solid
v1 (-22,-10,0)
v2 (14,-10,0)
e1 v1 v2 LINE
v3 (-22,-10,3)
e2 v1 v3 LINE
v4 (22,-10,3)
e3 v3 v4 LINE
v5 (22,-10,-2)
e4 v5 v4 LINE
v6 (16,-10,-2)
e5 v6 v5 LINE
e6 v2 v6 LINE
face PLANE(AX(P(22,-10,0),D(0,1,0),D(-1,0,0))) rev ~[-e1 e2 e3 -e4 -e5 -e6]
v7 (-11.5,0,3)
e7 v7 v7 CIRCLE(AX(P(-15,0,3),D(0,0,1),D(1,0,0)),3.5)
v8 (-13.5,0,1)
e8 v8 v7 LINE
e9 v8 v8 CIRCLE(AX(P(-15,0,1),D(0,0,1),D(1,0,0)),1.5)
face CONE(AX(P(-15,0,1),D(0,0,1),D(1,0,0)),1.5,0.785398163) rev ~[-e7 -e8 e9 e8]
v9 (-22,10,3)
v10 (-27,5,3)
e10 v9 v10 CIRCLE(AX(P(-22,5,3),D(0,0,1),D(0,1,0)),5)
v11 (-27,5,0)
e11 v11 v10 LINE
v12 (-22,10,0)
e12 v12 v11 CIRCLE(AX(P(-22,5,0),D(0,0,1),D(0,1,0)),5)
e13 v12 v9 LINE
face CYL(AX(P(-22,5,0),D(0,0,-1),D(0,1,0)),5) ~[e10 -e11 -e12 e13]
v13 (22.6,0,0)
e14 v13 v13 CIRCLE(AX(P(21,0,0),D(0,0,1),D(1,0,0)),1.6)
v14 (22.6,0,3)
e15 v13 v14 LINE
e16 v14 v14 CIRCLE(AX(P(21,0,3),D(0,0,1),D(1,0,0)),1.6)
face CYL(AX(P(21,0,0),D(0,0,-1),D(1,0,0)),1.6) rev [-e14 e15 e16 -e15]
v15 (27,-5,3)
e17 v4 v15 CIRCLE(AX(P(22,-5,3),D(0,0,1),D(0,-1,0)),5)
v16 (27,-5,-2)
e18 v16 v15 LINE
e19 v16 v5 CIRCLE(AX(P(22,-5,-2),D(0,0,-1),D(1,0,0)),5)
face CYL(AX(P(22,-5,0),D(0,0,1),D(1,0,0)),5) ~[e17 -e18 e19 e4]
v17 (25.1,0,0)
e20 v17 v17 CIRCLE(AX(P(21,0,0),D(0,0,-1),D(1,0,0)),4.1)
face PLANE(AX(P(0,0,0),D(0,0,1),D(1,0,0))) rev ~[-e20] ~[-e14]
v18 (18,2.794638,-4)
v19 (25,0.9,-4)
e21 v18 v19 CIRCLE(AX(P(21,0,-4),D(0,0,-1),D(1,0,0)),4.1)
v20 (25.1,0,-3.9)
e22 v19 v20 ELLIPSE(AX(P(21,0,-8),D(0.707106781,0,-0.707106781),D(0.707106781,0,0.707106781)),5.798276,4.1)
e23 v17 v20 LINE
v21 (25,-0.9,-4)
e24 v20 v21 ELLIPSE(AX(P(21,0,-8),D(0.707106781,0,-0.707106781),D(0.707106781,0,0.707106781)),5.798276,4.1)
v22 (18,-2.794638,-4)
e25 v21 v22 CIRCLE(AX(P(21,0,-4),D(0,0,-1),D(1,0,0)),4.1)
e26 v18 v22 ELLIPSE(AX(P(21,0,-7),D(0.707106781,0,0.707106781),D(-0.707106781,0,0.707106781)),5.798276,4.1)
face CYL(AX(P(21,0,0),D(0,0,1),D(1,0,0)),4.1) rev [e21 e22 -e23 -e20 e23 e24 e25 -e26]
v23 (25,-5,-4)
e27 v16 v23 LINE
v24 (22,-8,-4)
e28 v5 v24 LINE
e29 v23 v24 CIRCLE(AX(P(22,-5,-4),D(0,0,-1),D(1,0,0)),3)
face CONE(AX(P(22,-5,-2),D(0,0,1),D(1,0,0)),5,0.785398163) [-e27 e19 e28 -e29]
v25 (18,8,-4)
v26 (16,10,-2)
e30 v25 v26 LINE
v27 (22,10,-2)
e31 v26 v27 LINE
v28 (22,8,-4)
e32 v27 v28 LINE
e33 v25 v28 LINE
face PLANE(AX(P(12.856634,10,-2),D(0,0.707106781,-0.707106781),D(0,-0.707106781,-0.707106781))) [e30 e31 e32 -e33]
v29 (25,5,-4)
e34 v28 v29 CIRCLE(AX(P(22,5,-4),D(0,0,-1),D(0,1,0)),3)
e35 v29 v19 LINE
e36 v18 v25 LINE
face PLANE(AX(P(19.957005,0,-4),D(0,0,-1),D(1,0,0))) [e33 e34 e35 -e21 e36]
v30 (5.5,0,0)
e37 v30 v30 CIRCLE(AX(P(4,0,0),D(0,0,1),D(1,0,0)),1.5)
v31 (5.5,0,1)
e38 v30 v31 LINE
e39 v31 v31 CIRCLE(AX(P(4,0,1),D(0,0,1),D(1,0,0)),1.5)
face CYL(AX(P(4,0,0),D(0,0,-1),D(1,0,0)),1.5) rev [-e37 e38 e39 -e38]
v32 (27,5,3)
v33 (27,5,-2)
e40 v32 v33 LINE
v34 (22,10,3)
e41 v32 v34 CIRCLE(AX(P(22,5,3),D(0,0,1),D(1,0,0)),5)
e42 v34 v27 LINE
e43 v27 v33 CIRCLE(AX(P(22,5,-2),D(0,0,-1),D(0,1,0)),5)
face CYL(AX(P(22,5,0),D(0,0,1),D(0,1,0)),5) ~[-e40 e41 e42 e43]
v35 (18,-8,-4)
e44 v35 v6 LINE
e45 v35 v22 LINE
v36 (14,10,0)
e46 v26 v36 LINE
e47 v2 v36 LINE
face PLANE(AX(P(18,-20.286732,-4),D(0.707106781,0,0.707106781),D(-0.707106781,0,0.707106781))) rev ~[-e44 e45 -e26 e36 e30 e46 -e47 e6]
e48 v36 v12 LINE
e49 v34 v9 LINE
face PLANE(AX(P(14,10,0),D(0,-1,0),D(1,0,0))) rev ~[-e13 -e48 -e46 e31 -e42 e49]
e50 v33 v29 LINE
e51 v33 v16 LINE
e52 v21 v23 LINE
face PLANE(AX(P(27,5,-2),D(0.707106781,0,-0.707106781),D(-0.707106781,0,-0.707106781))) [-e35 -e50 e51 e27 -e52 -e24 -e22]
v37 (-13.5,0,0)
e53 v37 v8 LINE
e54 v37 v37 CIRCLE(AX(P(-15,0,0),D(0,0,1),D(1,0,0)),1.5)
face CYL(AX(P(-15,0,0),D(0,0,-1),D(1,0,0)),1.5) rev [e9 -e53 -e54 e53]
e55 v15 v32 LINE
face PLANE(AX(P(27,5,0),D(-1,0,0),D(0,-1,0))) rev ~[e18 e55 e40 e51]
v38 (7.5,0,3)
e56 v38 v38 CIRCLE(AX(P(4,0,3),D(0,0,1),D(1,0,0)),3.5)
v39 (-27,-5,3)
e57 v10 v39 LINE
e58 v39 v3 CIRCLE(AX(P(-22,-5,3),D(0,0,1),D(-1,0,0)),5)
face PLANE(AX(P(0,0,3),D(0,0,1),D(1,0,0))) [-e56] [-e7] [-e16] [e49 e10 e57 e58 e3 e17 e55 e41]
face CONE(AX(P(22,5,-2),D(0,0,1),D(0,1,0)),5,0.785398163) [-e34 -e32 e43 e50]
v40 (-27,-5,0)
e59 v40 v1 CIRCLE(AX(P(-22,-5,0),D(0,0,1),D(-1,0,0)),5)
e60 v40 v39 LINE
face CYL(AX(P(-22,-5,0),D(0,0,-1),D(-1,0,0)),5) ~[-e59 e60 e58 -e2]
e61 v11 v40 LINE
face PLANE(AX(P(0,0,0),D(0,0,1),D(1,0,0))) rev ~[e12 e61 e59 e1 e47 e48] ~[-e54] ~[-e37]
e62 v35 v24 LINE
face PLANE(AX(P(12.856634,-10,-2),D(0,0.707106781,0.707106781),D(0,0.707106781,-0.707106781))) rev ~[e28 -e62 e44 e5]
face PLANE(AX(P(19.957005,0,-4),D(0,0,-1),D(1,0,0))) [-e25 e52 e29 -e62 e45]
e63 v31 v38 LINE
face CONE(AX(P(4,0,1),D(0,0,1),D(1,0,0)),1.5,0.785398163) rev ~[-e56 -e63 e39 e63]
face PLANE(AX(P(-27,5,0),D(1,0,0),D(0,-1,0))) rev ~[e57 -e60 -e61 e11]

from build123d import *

# Parameters (mm, degrees)
F0_R        = 1.5
F0_R_2      = 1.6
F1_DEPTH    = 3
F2_SIZE     = 2
F3_R        = 4.1
F4_DEPTH    = 4
F5_T4_DEPTH = 40.5734639037
F6_T1_DEPTH = 9.1433659759
F6_T3_DEPTH = 10
F6_T6_ANGLE = 90
F6_T8_ANGLE = 90


# Not quite as in the source:
# - a fillet or chamfer that OpenCascade refuses, or shapes differently, is made with other operations: its cross-section is extruded or revolved along the edge and cut away or added


with BuildPart() as f1:
    # F0 (on Top) → F1 (new body)
    with BuildSketch(Plane.XY):
        with BuildLine():
            Line((22, 10), (-22, 10))
            ThreePointArc((-22, 10), (-25.5355339059, 8.5355339059), (-27, 5))
            Line((-27, 5), (-27, -5))
            ThreePointArc((-27, -5), (-25.5355339059, -8.5355339059), (-22, -10))
            Line((-22, -10), (22, -10))
            ThreePointArc((22, -10), (25.5355339059, -8.5355339059), (27, -5))
            Line((27, -5), (27, 5))
            ThreePointArc((27, 5), (25.5355339059, 8.5355339059), (22, 10))
        make_face()
        with Locations((-15, 0)):
            Circle(F0_R, mode=Mode.SUBTRACT)
        with Locations((4, 0)):
            Circle(F0_R, mode=Mode.SUBTRACT)
        with Locations((21, 0)):
            Circle(F0_R_2, mode=Mode.SUBTRACT)
    extrude(amount=F1_DEPTH)

    # F2
    f2_edges = [f1.edges().sort_by_distance(p)[0] for p in [
        (-16.5, 0, 3),
        (2.5, 0, 3),
    ]]
    chamfer(f2_edges, length=F2_SIZE)

    # F3 (on face) → F4 (join)
    with BuildSketch(Plane(origin=(0, 0, 0), x_dir=(1, 0, 0), z_dir=(0, 0, -1))):
        with BuildLine():
            Line((14, 10), (14, -10))
            Line((14, -10), (22, -10))
            ThreePointArc((22, -10), (25.5355339059, -8.5355339059), (27, -5))
            Line((27, -5), (27, 5))
            ThreePointArc((27, 5), (25.5355339059, 8.5355339059), (22, 10))
            Line((22, 10), (14, 10))
        make_face()
        with Locations((21, 0)):
            Circle(F3_R, mode=Mode.SUBTRACT)
    extrude(amount=F4_DEPTH)

    # F5: chamfer of 4 on 1 edges, made by hand


with BuildPart() as f5_tool2:
    # F5_s3 → F5_t4 (new body)
    with BuildSketch(Plane.XZ.offset(20.2867319519)):
        Polygon((18, -4), (14, 0), (14, -4), align=None)
    extrude(amount=-F5_T4_DEPTH)

    split(bisect_by=Plane.XY, keep=Keep.BOTTOM)


with BuildPart() as f1_1:
    add(f1.part)

    # F5_t1: cut F5_tool2
    add(f5_tool2.part, mode=Mode.SUBTRACT)

    # F6: chamfer of 2 on 5 edges, made by hand

    # F6_s2 → F6_t1 (cut)
    with BuildSketch(Plane.YZ.offset(12.8566340241)):
        Polygon((-10, -2), (-8, -4), (-10, -4), align=None)
        Polygon((10, -2), (8, -4), (10, -4), align=None)
    extrude(amount=F6_T1_DEPTH, mode=Mode.SUBTRACT)

    # F6_s4 → F6_t3 (cut)
    with BuildSketch(Plane.XZ.offset(-5)):
        Polygon((27, -2), (25, -4), (27, -4), align=None)
    extrude(amount=F6_T3_DEPTH, mode=Mode.SUBTRACT)

    # F6_s5 → F6_t6 (revolve, cut)
    with BuildSketch(Plane.XZ.offset(5)):
        Polygon((27, -2), (25, -4), (27, -4), align=None)
    revolve(axis=Axis((22, -5, -4), (0, 0, -1)), revolution_arc=F6_T6_ANGLE, mode=Mode.SUBTRACT)

    # F6_s7 → F6_t8 (revolve, cut)
    with BuildSketch(Plane.YZ.offset(22)):
        Polygon((10, -2), (8, -4), (10, -4), align=None)
    revolve(axis=Axis((22, 5, -4), (0, 0, -1)), revolution_arc=F6_T8_ANGLE, mode=Mode.SUBTRACT)


solid = f1_1.part
